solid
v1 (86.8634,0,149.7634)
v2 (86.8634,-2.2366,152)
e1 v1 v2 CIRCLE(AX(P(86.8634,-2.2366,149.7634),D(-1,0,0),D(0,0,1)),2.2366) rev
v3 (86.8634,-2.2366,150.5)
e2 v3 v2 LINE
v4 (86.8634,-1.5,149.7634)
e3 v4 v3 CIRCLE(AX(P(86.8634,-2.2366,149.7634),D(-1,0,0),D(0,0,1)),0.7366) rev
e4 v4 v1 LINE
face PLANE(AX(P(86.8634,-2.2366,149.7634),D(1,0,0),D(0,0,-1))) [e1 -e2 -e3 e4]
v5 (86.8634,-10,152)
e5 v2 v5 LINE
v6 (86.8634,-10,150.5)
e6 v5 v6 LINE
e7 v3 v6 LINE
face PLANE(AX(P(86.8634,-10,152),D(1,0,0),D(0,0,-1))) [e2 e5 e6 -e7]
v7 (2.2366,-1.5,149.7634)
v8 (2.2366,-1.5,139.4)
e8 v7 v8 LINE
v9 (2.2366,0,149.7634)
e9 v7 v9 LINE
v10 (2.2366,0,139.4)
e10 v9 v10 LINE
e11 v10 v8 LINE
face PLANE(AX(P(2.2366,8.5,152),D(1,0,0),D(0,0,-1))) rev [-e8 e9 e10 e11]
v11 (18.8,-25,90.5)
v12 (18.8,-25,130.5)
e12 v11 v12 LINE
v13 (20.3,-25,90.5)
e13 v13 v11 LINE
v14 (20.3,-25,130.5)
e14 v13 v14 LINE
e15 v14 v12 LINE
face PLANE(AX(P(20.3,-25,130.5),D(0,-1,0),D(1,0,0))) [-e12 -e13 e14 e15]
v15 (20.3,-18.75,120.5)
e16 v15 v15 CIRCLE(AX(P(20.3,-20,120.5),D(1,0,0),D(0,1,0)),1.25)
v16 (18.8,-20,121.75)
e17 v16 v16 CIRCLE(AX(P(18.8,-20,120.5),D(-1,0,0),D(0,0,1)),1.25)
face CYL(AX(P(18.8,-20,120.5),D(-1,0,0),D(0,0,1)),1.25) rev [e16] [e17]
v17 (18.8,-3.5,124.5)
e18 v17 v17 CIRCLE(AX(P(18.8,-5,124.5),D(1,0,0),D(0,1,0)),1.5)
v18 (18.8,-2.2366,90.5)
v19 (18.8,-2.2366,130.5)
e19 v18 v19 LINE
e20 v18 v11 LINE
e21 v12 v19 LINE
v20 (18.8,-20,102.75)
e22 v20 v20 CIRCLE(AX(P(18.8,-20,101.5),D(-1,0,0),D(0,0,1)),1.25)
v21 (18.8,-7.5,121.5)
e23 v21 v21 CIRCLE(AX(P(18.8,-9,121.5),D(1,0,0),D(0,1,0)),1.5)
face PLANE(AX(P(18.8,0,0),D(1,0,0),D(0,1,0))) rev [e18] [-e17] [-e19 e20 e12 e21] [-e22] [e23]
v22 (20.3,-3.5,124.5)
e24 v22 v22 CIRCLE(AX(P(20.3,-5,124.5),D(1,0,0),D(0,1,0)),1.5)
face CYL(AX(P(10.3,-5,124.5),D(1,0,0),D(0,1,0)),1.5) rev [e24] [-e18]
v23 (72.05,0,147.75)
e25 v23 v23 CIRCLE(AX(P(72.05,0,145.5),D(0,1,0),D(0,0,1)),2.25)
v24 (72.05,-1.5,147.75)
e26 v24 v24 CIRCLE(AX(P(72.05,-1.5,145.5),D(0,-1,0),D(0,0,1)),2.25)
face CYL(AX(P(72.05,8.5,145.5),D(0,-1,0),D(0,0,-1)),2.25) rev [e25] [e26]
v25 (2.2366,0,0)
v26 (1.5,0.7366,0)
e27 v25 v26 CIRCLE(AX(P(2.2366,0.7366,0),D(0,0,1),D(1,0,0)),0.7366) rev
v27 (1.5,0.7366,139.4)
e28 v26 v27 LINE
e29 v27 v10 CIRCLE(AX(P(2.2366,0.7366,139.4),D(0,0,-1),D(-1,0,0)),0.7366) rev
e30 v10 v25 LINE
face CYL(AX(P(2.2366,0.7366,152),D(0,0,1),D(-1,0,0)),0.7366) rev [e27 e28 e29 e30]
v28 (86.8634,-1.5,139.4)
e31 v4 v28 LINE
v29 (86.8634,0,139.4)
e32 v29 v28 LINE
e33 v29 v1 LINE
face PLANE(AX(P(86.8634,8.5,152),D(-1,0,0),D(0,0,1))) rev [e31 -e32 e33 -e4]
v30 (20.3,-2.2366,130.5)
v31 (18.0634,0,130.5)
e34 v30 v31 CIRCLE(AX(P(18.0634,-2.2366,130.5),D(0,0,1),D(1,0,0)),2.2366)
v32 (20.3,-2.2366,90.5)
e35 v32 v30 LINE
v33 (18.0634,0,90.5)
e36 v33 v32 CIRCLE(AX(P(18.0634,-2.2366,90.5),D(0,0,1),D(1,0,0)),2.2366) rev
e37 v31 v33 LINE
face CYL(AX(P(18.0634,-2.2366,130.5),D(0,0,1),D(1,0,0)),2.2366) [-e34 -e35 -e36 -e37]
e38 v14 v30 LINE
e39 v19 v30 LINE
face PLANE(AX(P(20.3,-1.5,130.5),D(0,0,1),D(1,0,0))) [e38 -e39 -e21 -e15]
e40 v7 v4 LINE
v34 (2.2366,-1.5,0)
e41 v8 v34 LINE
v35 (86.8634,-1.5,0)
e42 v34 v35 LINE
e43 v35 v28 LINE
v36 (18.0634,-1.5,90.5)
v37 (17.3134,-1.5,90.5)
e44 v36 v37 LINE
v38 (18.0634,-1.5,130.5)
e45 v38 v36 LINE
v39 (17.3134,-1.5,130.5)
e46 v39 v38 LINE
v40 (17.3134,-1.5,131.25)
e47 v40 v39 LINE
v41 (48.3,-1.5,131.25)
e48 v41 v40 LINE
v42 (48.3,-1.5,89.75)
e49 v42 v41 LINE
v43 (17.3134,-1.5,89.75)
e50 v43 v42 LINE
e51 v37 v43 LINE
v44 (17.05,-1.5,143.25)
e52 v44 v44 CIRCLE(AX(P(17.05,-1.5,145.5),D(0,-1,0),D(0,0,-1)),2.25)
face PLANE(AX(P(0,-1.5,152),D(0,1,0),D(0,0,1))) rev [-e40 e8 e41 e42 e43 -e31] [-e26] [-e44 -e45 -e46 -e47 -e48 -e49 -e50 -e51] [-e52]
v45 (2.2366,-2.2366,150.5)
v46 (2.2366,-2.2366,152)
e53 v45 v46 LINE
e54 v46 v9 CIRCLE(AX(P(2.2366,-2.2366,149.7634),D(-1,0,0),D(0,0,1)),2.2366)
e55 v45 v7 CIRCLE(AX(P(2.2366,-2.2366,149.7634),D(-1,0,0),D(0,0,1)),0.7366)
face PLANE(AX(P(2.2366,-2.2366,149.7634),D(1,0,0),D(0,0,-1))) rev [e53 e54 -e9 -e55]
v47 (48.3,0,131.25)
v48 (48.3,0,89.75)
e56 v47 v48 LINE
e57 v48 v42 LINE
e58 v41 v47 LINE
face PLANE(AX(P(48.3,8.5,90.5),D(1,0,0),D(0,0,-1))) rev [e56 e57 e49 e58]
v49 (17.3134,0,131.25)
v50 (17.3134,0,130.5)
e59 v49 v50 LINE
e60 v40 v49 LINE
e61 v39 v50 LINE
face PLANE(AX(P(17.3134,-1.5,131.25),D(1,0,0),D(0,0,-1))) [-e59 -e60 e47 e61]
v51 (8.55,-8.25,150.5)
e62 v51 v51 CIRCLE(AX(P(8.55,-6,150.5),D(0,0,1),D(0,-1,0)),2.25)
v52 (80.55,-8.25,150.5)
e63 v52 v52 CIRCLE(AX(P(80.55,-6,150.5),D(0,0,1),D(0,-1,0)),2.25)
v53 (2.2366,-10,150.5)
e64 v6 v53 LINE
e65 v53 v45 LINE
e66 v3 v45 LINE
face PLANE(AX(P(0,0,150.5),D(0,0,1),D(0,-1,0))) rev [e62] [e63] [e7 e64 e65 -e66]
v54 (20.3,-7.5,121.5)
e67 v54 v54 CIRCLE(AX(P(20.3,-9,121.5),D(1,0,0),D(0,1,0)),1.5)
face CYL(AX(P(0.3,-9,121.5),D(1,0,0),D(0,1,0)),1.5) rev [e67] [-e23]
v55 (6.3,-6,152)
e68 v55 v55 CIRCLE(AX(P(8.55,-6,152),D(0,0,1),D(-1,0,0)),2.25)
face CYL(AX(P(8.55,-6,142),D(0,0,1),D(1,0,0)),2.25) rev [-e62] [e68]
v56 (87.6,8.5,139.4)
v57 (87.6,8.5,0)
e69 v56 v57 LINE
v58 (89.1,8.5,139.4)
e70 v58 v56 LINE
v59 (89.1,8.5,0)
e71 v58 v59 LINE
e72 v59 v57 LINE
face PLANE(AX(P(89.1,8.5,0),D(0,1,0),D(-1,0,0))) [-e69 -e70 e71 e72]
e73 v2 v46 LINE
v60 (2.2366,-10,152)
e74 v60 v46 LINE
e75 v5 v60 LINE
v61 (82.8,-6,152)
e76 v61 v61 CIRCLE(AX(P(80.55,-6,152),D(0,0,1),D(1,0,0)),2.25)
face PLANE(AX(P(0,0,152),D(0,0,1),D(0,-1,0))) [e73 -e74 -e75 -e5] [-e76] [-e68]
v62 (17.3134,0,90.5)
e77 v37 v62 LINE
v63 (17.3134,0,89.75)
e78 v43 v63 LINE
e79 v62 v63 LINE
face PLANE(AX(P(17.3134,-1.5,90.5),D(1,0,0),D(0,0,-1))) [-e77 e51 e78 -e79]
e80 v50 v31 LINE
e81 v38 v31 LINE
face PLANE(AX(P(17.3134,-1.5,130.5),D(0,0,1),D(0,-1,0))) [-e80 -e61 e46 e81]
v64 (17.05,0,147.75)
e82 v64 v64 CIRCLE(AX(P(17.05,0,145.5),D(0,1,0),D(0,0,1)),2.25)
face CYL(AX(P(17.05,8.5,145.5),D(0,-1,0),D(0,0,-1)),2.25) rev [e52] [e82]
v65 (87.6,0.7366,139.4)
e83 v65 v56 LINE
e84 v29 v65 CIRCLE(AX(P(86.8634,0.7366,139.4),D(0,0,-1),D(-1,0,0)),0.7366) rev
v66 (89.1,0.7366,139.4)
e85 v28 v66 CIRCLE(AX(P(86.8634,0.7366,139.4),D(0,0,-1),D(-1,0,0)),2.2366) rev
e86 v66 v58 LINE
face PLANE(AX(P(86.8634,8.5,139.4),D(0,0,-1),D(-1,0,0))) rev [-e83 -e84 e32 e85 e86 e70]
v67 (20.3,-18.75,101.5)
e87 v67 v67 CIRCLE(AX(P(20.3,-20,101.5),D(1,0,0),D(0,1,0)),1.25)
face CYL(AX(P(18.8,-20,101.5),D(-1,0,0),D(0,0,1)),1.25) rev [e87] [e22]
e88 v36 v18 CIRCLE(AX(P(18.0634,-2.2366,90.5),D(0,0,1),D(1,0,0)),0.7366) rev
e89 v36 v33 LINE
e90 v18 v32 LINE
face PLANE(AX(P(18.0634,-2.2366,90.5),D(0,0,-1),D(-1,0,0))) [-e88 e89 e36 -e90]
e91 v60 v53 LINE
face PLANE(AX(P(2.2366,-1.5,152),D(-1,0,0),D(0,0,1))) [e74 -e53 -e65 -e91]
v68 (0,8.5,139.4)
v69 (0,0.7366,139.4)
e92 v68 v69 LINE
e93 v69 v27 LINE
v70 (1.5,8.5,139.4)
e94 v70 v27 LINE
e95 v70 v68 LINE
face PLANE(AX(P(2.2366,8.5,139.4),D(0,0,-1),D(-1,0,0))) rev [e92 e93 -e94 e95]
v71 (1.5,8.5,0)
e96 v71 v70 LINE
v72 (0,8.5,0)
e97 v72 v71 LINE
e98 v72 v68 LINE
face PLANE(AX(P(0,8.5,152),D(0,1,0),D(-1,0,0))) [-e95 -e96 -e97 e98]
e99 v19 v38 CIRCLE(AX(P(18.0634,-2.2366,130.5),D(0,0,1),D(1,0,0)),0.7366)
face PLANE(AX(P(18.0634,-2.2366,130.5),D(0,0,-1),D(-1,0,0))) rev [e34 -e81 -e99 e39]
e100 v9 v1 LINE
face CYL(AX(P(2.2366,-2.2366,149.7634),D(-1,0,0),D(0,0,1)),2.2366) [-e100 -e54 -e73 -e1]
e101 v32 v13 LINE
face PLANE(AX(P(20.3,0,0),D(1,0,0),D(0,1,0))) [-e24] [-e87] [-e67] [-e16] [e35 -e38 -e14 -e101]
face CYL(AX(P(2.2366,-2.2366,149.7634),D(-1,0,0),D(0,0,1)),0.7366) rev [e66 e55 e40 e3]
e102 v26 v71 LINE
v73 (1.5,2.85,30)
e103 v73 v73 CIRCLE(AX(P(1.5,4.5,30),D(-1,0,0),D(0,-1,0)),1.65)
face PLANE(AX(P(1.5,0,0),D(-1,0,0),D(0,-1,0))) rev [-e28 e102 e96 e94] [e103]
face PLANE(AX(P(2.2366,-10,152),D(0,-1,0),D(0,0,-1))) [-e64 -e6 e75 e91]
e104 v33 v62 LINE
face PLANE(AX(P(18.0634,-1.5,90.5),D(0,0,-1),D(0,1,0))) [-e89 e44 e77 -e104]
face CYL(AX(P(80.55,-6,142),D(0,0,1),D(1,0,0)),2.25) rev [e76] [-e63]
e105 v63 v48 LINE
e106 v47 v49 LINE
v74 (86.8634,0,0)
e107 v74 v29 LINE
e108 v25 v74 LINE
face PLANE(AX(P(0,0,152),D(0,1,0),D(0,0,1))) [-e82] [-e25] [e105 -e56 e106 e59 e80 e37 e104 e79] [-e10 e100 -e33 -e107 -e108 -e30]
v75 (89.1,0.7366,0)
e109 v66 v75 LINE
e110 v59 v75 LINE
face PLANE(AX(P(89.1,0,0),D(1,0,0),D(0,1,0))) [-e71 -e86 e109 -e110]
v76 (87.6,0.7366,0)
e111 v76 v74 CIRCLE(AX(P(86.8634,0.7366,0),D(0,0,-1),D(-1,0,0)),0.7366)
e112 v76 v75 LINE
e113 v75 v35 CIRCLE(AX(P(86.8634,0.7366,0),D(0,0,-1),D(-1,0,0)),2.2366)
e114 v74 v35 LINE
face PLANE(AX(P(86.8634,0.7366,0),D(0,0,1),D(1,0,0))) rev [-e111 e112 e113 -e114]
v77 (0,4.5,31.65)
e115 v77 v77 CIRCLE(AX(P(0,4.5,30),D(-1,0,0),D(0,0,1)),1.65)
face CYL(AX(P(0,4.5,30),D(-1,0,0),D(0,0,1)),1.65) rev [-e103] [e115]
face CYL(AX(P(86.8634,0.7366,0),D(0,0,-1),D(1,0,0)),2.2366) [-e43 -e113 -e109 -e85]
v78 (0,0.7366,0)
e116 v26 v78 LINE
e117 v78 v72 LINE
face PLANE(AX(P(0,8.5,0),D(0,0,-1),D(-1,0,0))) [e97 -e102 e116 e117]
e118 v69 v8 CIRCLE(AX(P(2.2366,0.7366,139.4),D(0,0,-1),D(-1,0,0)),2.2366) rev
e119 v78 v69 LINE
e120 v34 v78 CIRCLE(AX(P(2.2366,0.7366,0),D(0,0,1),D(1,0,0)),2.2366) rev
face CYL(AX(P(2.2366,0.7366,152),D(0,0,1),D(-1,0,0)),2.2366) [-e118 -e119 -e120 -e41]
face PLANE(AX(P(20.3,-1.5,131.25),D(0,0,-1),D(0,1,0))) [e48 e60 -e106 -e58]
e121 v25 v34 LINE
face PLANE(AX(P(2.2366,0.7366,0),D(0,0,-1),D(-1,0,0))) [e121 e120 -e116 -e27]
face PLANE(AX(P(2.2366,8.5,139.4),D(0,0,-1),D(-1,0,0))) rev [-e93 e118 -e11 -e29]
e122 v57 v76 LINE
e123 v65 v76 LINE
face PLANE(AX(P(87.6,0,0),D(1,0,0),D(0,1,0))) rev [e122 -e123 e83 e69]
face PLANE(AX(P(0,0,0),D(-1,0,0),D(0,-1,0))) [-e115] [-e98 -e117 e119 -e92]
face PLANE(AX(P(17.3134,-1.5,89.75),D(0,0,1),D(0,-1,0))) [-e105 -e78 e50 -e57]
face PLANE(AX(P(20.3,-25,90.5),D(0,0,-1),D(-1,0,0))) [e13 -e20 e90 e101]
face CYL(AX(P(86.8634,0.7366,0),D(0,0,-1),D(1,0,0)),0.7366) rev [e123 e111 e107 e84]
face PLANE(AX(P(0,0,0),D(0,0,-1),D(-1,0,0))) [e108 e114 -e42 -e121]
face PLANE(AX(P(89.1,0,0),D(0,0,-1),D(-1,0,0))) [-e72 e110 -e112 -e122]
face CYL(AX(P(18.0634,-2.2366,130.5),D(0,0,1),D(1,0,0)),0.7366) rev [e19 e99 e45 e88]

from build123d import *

# Parameters (mm, degrees)
SKETCH_2_W                       = 89.1
SKETCH_2_H                       = 1.5
SM_BASE_FLANGE_1_DEPTH           = 152
SM_EDGE_FLANGE_1_STRIP_W         = 7.4732
SM_EDGE_FLANGE_1_STRIP_H         = 1.5
SM_EDGE_FLANGE_1_STRIP_CUT_DEPTH = 152
SM_EDGE_FLANGE_1_DEPTH           = 152
SM_EDGE_FLANGE_2_STRIP_W         = 7.4732
SM_EDGE_FLANGE_2_STRIP_H         = 1.5
SM_EDGE_FLANGE_2_STRIP_CUT_DEPTH = 152
SM_EDGE_FLANGE_2_DEPTH           = 152
SKETCH_13_W                      = 16.114616681
SKETCH_13_H                      = 12.6
SKETCH_13_W_2                    = 14.895249376
CUT_EXTRUDE_1_DEPTH              = 177.473255764
SM_EDGE_FLANGE_3_STRIP_W         = 7.4732
SM_EDGE_FLANGE_3_STRIP_H         = 1.5
SM_EDGE_FLANGE_3_STRIP_CUT_DEPTH = 84.6268
SM_EDGE_FLANGE_3_DEPTH           = 84.6268
SKETCH_17_R                      = 2.25
CUT_EXTRUDE_2_DEPTH              = 10
SKETCH_18_R                      = 2.25
CUT_EXTRUDE_3_DEPTH              = 10
SKETCH_19_W                      = 28
SKETCH_19_H                      = 40
CUT_EXTRUDE_4_DEPTH              = 10
SM_START                         = 89.75
SM_EDGE_FLANGE_4_DEPTH           = 41.5
SM_EDGE_FLANGE_4_2_DEPTH         = 0.75
SM_START_2                       = 130.5
SM_EDGE_FLANGE_4_3_DEPTH         = 0.75
SM_START_3                       = 90.5
SM_EDGE_FLANGE_4_4_DEPTH         = 40
HOLE_WIZARD_M3_1_D               = 2.5
HOLE_WIZARD_M3_1_DEPTH           = 7.5
HOLE_WIZARD_M3_1_TIP             = 0.751075774
HOLE_WIZARD_M4_1_D               = 3.3
HOLE_WIZARD_M4_1_DEPTH           = 10.1
HOLE_WIZARD_M4_1_TIP             = 0.991420021
SKETCH_27_R                      = 1.5
CUT_EXTRUDE_5_DEPTH              = 20
SKETCH_28_R                      = 1.5
CUT_EXTRUDE_6_DEPTH              = 10
CUT_EXTRUDE_START                = -0.75
SKETCH_29_W                      = 28
SKETCH_29_H                      = 1.5
CUT_EXTRUDE_7_DEPTH              = 0.75
SKETCH_30_W                      = 28
SKETCH_30_H                      = 1.5
CUT_EXTRUDE_8_DEPTH              = 0.75


# Read off the part's stored shape, not the designer's step: 边线-法兰4
# Sheet-metal steps are written as plain solids
with BuildPart() as part:
    # Sketch 2 → 基体-法兰1 (new body)
    with BuildSketch(Plane.XY):
        with Locations((44.55, -0.75)):
            Rectangle(SKETCH_2_W, SKETCH_2_H)
    extrude(amount=SM_BASE_FLANGE_1_DEPTH)

    # 边线-法兰1 strip (across the edge) → 边线-法兰1 strip cut (cut)
    with BuildSketch(Plane.XY):
        with Locations((-1.5, -0.75)):
            Rectangle(SM_EDGE_FLANGE_1_STRIP_W, SM_EDGE_FLANGE_1_STRIP_H)
    extrude(amount=SM_EDGE_FLANGE_1_STRIP_CUT_DEPTH, mode=Mode.SUBTRACT)

    # 边线-法兰1 section (across the edge) → 边线-法兰1 (add)
    with BuildSketch(Plane.XY):
        with BuildLine():
            Line((0, 0.7366), (0, 8.5))
            Line((0, 8.5), (1.5, 8.5))
            Line((1.5, 8.5), (1.5, 0.7366))
            ThreePointArc((1.5, 0.7366), (1.715745145, 0.215745145), (2.2366, 0))
            Line((2.2366, 0), (2.2366, -1.5))
            ThreePointArc((2.2366, -1.5), (0.655084973, -0.844915027), (0, 0.7366))
        make_face()
    extrude(amount=SM_EDGE_FLANGE_1_DEPTH)

    # 边线-法兰2 strip (across the edge) → 边线-法兰2 strip cut (cut)
    with BuildSketch(Plane(origin=(89.1, 0, 152), x_dir=(-1, 0, 0), z_dir=(0, 0, -1))):
        with Locations((-1.5, -0.75)):
            Rectangle(SM_EDGE_FLANGE_2_STRIP_W, SM_EDGE_FLANGE_2_STRIP_H)
    extrude(amount=SM_EDGE_FLANGE_2_STRIP_CUT_DEPTH, mode=Mode.SUBTRACT)

    # 边线-法兰2 section (across the edge) → 边线-法兰2 (add)
    with BuildSketch(Plane(origin=(89.1, 0, 152), x_dir=(-1, 0, 0), z_dir=(0, 0, -1))):
        with BuildLine():
            Line((0, 0.7366), (0, 8.5))
            Line((0, 8.5), (1.5, 8.5))
            Line((1.5, 8.5), (1.5, 0.7366))
            ThreePointArc((1.5, 0.7366), (1.715745145, 0.215745145), (2.2366, 0))
            Line((2.2366, 0), (2.2366, -1.5))
            ThreePointArc((2.2366, -1.5), (0.655084973, -0.844915027), (0, 0.7366))
        make_face()
    extrude(amount=SM_EDGE_FLANGE_2_DEPTH)

    # 草图13 → 切除-拉伸1 (cut, through all)
    with BuildSketch(Plane.XZ.offset(1.5)):
        with Locations((-5.82070834, 145.7)):
            Rectangle(SKETCH_13_W, SKETCH_13_H)
        with Locations((94.311024688, 145.7)):
            Rectangle(SKETCH_13_W_2, SKETCH_13_H)
    extrude(amount=-CUT_EXTRUDE_1_DEPTH, mode=Mode.SUBTRACT)

    # 边线-法兰3 strip (across the edge) → 边线-法兰3 strip cut (cut)
    with BuildSketch(Plane(origin=(86.8634, -1.5, 152), x_dir=(0, 0, -1), z_dir=(-1, 0, 0))):
        with Locations((-1.5, -0.75)):
            Rectangle(SM_EDGE_FLANGE_3_STRIP_W, SM_EDGE_FLANGE_3_STRIP_H)
    extrude(amount=SM_EDGE_FLANGE_3_STRIP_CUT_DEPTH, mode=Mode.SUBTRACT)

    # 边线-法兰3 section (across the edge) → 边线-法兰3 (add)
    with BuildSketch(Plane(origin=(86.8634, -1.5, 152), x_dir=(0, 0, -1), z_dir=(-1, 0, 0))):
        with BuildLine():
            Line((0, 0.7366), (0, 8.5))
            Line((0, 8.5), (1.5, 8.5))
            Line((1.5, 8.5), (1.5, 0.7366))
            ThreePointArc((1.5, 0.7366), (1.715745145, 0.215745145), (2.2366, 0))
            Line((2.2366, 0), (2.2366, -1.5))
            ThreePointArc((2.2366, -1.5), (0.655084973, -0.844915027), (0, 0.7366))
        make_face()
    extrude(amount=SM_EDGE_FLANGE_3_DEPTH)

    # 草图17 → 切除-拉伸2 (cut)
    with BuildSketch(Plane.XY.offset(152)):
        with Locations((80.55, -6)):
            Circle(SKETCH_17_R)
        with Locations(Location((8.55, -6, 0), (0, 0, 270))):
            Circle(SKETCH_17_R)
    extrude(amount=-CUT_EXTRUDE_2_DEPTH, mode=Mode.SUBTRACT)

    # 草图18 → 切除-拉伸3 (cut)
    with BuildSketch(Plane.XZ.offset(1.5)):
        with Locations(Location((17.05, 145.5, 0), (0, 0, 270))):
            Circle(SKETCH_18_R)
        with Locations(Location((72.05, 145.5, 0), (0, 0, 90))):
            Circle(SKETCH_18_R)
    extrude(amount=-CUT_EXTRUDE_3_DEPTH, mode=Mode.SUBTRACT)

    # 草图19 → 切除-拉伸4 (cut)
    with BuildSketch(Plane.XZ.offset(1.5)):
        with Locations((34.3, 110.5)):
            Rectangle(SKETCH_19_W, SKETCH_19_H)
    extrude(amount=-CUT_EXTRUDE_4_DEPTH, mode=Mode.SUBTRACT)

    # 边线-法兰4 outline → 边线-法兰4 (cut)
    with BuildSketch(Plane.XY.offset(SM_START)):
        with BuildLine():
            Line((20.3, -1.5), (20.3, 0))
            Line((20.3, 0), (18.0634, 0))
            ThreePointArc((18.0634, 0), (19.358564082, -0.413161062), (20.175223856, -1.5))
            Line((20.175223856, -1.5), (20.3, -1.5))
        make_face()
    extrude(amount=SM_EDGE_FLANGE_4_DEPTH, mode=Mode.SUBTRACT)

    # Sm Edge Flange 4 2 outline → Sm Edge Flange 4 2 (cut)
    with BuildSketch(Plane.XY.offset(SM_START)):
        with BuildLine():
            ThreePointArc((20.175223856, -1.5), (19.358564082, -0.413161062), (18.0634, 0))
            Line((18.0634, 0), (17.3134, 0))
            Line((17.3134, 0), (17.3134, -1.5))
            Line((17.3134, -1.5), (20.175223856, -1.5))
        make_face()
    extrude(amount=SM_EDGE_FLANGE_4_2_DEPTH, mode=Mode.SUBTRACT)

    # Sm Edge Flange 4 3 outline → Sm Edge Flange 4 3 (cut)
    with BuildSketch(Plane.XY.offset(SM_START_2)):
        with BuildLine():
            ThreePointArc((20.175223856, -1.5), (19.358564082, -0.413161062), (18.0634, 0))
            Line((18.0634, 0), (17.3134, 0))
            Line((17.3134, 0), (17.3134, -1.5))
            Line((17.3134, -1.5), (20.175223856, -1.5))
        make_face()
    extrude(amount=SM_EDGE_FLANGE_4_3_DEPTH, mode=Mode.SUBTRACT)

    # Sm Edge Flange 4 4 outline → Sm Edge Flange 4 4 (add)
    with BuildSketch(Plane.XY.offset(SM_START_3)):
        with BuildLine():
            ThreePointArc((20.3, -2.2366), (20.268585343, -1.863053267), (20.175223856, -1.5))
            Line((20.175223856, -1.5), (18.0634, -1.5))
            ThreePointArc((18.0634, -1.5), (18.584254855, -1.715745145), (18.8, -2.2366))
            Line((18.8, -2.2366), (18.8, -25))
            Line((18.8, -25), (20.3, -25))
            Line((20.3, -25), (20.3, -2.2366))
        make_face()
    extrude(amount=SM_EDGE_FLANGE_4_4_DEPTH)

    # M3 螺纹孔1
    with Locations(Plane.ZY.offset(-18.8)):
        with Locations((101.5, -20), (120.5, -20)):
            Hole(HOLE_WIZARD_M3_1_D / 2, depth=HOLE_WIZARD_M3_1_DEPTH)
            with Locations((0, 0, -(HOLE_WIZARD_M3_1_DEPTH + HOLE_WIZARD_M3_1_TIP / 2))):  # 118° drill point
                Cone(0, HOLE_WIZARD_M3_1_D / 2, HOLE_WIZARD_M3_1_TIP, mode=Mode.SUBTRACT)

    # M4 螺纹孔1
    with Locations(Plane.ZY):
        with Locations((30, 4.5)):
            Hole(HOLE_WIZARD_M4_1_D / 2, depth=HOLE_WIZARD_M4_1_DEPTH)
            with Locations((0, 0, -(HOLE_WIZARD_M4_1_DEPTH + HOLE_WIZARD_M4_1_TIP / 2))):  # 118° drill point
                Cone(0, HOLE_WIZARD_M4_1_D / 2, HOLE_WIZARD_M4_1_TIP, mode=Mode.SUBTRACT)

    # 草图27 → 切除-拉伸5 (cut)
    with BuildSketch(Plane(origin=(20.3, 0, 0), x_dir=(0, 0, -1), z_dir=(1, 0, 0))):
        with Locations(Location((-121.5, -9, 0), (0, 0, 90))):
            Circle(SKETCH_27_R)
    extrude(amount=-CUT_EXTRUDE_5_DEPTH, mode=Mode.SUBTRACT)

    # 草图28 → 切除-拉伸6 (cut)
    with BuildSketch(Plane(origin=(20.3, 0, 0), x_dir=(0, 0, -1), z_dir=(1, 0, 0))):
        with Locations(Location((-124.5, -5, 0), (0, 0, 90))):
            Circle(SKETCH_28_R)
    extrude(amount=-CUT_EXTRUDE_6_DEPTH, mode=Mode.SUBTRACT)

    # 草图29 → 切除-拉伸7 (cut)
    with BuildSketch(Plane.XY.offset(90.5).offset(CUT_EXTRUDE_START)):
        with Locations((34.3, -0.75)):
            Rectangle(SKETCH_29_W, SKETCH_29_H)
    extrude(amount=CUT_EXTRUDE_7_DEPTH, mode=Mode.SUBTRACT)

    # 草图30 → 切除-拉伸8 (cut)
    with BuildSketch(Plane(origin=(0, 0, 130.5), x_dir=(-1, 0, 0), z_dir=(0, 0, -1)).offset(CUT_EXTRUDE_START)):
        with Locations((-34.3, -0.75)):
            Rectangle(SKETCH_30_W, SKETCH_30_H)
    extrude(amount=CUT_EXTRUDE_8_DEPTH, mode=Mode.SUBTRACT)


solid = part.part
